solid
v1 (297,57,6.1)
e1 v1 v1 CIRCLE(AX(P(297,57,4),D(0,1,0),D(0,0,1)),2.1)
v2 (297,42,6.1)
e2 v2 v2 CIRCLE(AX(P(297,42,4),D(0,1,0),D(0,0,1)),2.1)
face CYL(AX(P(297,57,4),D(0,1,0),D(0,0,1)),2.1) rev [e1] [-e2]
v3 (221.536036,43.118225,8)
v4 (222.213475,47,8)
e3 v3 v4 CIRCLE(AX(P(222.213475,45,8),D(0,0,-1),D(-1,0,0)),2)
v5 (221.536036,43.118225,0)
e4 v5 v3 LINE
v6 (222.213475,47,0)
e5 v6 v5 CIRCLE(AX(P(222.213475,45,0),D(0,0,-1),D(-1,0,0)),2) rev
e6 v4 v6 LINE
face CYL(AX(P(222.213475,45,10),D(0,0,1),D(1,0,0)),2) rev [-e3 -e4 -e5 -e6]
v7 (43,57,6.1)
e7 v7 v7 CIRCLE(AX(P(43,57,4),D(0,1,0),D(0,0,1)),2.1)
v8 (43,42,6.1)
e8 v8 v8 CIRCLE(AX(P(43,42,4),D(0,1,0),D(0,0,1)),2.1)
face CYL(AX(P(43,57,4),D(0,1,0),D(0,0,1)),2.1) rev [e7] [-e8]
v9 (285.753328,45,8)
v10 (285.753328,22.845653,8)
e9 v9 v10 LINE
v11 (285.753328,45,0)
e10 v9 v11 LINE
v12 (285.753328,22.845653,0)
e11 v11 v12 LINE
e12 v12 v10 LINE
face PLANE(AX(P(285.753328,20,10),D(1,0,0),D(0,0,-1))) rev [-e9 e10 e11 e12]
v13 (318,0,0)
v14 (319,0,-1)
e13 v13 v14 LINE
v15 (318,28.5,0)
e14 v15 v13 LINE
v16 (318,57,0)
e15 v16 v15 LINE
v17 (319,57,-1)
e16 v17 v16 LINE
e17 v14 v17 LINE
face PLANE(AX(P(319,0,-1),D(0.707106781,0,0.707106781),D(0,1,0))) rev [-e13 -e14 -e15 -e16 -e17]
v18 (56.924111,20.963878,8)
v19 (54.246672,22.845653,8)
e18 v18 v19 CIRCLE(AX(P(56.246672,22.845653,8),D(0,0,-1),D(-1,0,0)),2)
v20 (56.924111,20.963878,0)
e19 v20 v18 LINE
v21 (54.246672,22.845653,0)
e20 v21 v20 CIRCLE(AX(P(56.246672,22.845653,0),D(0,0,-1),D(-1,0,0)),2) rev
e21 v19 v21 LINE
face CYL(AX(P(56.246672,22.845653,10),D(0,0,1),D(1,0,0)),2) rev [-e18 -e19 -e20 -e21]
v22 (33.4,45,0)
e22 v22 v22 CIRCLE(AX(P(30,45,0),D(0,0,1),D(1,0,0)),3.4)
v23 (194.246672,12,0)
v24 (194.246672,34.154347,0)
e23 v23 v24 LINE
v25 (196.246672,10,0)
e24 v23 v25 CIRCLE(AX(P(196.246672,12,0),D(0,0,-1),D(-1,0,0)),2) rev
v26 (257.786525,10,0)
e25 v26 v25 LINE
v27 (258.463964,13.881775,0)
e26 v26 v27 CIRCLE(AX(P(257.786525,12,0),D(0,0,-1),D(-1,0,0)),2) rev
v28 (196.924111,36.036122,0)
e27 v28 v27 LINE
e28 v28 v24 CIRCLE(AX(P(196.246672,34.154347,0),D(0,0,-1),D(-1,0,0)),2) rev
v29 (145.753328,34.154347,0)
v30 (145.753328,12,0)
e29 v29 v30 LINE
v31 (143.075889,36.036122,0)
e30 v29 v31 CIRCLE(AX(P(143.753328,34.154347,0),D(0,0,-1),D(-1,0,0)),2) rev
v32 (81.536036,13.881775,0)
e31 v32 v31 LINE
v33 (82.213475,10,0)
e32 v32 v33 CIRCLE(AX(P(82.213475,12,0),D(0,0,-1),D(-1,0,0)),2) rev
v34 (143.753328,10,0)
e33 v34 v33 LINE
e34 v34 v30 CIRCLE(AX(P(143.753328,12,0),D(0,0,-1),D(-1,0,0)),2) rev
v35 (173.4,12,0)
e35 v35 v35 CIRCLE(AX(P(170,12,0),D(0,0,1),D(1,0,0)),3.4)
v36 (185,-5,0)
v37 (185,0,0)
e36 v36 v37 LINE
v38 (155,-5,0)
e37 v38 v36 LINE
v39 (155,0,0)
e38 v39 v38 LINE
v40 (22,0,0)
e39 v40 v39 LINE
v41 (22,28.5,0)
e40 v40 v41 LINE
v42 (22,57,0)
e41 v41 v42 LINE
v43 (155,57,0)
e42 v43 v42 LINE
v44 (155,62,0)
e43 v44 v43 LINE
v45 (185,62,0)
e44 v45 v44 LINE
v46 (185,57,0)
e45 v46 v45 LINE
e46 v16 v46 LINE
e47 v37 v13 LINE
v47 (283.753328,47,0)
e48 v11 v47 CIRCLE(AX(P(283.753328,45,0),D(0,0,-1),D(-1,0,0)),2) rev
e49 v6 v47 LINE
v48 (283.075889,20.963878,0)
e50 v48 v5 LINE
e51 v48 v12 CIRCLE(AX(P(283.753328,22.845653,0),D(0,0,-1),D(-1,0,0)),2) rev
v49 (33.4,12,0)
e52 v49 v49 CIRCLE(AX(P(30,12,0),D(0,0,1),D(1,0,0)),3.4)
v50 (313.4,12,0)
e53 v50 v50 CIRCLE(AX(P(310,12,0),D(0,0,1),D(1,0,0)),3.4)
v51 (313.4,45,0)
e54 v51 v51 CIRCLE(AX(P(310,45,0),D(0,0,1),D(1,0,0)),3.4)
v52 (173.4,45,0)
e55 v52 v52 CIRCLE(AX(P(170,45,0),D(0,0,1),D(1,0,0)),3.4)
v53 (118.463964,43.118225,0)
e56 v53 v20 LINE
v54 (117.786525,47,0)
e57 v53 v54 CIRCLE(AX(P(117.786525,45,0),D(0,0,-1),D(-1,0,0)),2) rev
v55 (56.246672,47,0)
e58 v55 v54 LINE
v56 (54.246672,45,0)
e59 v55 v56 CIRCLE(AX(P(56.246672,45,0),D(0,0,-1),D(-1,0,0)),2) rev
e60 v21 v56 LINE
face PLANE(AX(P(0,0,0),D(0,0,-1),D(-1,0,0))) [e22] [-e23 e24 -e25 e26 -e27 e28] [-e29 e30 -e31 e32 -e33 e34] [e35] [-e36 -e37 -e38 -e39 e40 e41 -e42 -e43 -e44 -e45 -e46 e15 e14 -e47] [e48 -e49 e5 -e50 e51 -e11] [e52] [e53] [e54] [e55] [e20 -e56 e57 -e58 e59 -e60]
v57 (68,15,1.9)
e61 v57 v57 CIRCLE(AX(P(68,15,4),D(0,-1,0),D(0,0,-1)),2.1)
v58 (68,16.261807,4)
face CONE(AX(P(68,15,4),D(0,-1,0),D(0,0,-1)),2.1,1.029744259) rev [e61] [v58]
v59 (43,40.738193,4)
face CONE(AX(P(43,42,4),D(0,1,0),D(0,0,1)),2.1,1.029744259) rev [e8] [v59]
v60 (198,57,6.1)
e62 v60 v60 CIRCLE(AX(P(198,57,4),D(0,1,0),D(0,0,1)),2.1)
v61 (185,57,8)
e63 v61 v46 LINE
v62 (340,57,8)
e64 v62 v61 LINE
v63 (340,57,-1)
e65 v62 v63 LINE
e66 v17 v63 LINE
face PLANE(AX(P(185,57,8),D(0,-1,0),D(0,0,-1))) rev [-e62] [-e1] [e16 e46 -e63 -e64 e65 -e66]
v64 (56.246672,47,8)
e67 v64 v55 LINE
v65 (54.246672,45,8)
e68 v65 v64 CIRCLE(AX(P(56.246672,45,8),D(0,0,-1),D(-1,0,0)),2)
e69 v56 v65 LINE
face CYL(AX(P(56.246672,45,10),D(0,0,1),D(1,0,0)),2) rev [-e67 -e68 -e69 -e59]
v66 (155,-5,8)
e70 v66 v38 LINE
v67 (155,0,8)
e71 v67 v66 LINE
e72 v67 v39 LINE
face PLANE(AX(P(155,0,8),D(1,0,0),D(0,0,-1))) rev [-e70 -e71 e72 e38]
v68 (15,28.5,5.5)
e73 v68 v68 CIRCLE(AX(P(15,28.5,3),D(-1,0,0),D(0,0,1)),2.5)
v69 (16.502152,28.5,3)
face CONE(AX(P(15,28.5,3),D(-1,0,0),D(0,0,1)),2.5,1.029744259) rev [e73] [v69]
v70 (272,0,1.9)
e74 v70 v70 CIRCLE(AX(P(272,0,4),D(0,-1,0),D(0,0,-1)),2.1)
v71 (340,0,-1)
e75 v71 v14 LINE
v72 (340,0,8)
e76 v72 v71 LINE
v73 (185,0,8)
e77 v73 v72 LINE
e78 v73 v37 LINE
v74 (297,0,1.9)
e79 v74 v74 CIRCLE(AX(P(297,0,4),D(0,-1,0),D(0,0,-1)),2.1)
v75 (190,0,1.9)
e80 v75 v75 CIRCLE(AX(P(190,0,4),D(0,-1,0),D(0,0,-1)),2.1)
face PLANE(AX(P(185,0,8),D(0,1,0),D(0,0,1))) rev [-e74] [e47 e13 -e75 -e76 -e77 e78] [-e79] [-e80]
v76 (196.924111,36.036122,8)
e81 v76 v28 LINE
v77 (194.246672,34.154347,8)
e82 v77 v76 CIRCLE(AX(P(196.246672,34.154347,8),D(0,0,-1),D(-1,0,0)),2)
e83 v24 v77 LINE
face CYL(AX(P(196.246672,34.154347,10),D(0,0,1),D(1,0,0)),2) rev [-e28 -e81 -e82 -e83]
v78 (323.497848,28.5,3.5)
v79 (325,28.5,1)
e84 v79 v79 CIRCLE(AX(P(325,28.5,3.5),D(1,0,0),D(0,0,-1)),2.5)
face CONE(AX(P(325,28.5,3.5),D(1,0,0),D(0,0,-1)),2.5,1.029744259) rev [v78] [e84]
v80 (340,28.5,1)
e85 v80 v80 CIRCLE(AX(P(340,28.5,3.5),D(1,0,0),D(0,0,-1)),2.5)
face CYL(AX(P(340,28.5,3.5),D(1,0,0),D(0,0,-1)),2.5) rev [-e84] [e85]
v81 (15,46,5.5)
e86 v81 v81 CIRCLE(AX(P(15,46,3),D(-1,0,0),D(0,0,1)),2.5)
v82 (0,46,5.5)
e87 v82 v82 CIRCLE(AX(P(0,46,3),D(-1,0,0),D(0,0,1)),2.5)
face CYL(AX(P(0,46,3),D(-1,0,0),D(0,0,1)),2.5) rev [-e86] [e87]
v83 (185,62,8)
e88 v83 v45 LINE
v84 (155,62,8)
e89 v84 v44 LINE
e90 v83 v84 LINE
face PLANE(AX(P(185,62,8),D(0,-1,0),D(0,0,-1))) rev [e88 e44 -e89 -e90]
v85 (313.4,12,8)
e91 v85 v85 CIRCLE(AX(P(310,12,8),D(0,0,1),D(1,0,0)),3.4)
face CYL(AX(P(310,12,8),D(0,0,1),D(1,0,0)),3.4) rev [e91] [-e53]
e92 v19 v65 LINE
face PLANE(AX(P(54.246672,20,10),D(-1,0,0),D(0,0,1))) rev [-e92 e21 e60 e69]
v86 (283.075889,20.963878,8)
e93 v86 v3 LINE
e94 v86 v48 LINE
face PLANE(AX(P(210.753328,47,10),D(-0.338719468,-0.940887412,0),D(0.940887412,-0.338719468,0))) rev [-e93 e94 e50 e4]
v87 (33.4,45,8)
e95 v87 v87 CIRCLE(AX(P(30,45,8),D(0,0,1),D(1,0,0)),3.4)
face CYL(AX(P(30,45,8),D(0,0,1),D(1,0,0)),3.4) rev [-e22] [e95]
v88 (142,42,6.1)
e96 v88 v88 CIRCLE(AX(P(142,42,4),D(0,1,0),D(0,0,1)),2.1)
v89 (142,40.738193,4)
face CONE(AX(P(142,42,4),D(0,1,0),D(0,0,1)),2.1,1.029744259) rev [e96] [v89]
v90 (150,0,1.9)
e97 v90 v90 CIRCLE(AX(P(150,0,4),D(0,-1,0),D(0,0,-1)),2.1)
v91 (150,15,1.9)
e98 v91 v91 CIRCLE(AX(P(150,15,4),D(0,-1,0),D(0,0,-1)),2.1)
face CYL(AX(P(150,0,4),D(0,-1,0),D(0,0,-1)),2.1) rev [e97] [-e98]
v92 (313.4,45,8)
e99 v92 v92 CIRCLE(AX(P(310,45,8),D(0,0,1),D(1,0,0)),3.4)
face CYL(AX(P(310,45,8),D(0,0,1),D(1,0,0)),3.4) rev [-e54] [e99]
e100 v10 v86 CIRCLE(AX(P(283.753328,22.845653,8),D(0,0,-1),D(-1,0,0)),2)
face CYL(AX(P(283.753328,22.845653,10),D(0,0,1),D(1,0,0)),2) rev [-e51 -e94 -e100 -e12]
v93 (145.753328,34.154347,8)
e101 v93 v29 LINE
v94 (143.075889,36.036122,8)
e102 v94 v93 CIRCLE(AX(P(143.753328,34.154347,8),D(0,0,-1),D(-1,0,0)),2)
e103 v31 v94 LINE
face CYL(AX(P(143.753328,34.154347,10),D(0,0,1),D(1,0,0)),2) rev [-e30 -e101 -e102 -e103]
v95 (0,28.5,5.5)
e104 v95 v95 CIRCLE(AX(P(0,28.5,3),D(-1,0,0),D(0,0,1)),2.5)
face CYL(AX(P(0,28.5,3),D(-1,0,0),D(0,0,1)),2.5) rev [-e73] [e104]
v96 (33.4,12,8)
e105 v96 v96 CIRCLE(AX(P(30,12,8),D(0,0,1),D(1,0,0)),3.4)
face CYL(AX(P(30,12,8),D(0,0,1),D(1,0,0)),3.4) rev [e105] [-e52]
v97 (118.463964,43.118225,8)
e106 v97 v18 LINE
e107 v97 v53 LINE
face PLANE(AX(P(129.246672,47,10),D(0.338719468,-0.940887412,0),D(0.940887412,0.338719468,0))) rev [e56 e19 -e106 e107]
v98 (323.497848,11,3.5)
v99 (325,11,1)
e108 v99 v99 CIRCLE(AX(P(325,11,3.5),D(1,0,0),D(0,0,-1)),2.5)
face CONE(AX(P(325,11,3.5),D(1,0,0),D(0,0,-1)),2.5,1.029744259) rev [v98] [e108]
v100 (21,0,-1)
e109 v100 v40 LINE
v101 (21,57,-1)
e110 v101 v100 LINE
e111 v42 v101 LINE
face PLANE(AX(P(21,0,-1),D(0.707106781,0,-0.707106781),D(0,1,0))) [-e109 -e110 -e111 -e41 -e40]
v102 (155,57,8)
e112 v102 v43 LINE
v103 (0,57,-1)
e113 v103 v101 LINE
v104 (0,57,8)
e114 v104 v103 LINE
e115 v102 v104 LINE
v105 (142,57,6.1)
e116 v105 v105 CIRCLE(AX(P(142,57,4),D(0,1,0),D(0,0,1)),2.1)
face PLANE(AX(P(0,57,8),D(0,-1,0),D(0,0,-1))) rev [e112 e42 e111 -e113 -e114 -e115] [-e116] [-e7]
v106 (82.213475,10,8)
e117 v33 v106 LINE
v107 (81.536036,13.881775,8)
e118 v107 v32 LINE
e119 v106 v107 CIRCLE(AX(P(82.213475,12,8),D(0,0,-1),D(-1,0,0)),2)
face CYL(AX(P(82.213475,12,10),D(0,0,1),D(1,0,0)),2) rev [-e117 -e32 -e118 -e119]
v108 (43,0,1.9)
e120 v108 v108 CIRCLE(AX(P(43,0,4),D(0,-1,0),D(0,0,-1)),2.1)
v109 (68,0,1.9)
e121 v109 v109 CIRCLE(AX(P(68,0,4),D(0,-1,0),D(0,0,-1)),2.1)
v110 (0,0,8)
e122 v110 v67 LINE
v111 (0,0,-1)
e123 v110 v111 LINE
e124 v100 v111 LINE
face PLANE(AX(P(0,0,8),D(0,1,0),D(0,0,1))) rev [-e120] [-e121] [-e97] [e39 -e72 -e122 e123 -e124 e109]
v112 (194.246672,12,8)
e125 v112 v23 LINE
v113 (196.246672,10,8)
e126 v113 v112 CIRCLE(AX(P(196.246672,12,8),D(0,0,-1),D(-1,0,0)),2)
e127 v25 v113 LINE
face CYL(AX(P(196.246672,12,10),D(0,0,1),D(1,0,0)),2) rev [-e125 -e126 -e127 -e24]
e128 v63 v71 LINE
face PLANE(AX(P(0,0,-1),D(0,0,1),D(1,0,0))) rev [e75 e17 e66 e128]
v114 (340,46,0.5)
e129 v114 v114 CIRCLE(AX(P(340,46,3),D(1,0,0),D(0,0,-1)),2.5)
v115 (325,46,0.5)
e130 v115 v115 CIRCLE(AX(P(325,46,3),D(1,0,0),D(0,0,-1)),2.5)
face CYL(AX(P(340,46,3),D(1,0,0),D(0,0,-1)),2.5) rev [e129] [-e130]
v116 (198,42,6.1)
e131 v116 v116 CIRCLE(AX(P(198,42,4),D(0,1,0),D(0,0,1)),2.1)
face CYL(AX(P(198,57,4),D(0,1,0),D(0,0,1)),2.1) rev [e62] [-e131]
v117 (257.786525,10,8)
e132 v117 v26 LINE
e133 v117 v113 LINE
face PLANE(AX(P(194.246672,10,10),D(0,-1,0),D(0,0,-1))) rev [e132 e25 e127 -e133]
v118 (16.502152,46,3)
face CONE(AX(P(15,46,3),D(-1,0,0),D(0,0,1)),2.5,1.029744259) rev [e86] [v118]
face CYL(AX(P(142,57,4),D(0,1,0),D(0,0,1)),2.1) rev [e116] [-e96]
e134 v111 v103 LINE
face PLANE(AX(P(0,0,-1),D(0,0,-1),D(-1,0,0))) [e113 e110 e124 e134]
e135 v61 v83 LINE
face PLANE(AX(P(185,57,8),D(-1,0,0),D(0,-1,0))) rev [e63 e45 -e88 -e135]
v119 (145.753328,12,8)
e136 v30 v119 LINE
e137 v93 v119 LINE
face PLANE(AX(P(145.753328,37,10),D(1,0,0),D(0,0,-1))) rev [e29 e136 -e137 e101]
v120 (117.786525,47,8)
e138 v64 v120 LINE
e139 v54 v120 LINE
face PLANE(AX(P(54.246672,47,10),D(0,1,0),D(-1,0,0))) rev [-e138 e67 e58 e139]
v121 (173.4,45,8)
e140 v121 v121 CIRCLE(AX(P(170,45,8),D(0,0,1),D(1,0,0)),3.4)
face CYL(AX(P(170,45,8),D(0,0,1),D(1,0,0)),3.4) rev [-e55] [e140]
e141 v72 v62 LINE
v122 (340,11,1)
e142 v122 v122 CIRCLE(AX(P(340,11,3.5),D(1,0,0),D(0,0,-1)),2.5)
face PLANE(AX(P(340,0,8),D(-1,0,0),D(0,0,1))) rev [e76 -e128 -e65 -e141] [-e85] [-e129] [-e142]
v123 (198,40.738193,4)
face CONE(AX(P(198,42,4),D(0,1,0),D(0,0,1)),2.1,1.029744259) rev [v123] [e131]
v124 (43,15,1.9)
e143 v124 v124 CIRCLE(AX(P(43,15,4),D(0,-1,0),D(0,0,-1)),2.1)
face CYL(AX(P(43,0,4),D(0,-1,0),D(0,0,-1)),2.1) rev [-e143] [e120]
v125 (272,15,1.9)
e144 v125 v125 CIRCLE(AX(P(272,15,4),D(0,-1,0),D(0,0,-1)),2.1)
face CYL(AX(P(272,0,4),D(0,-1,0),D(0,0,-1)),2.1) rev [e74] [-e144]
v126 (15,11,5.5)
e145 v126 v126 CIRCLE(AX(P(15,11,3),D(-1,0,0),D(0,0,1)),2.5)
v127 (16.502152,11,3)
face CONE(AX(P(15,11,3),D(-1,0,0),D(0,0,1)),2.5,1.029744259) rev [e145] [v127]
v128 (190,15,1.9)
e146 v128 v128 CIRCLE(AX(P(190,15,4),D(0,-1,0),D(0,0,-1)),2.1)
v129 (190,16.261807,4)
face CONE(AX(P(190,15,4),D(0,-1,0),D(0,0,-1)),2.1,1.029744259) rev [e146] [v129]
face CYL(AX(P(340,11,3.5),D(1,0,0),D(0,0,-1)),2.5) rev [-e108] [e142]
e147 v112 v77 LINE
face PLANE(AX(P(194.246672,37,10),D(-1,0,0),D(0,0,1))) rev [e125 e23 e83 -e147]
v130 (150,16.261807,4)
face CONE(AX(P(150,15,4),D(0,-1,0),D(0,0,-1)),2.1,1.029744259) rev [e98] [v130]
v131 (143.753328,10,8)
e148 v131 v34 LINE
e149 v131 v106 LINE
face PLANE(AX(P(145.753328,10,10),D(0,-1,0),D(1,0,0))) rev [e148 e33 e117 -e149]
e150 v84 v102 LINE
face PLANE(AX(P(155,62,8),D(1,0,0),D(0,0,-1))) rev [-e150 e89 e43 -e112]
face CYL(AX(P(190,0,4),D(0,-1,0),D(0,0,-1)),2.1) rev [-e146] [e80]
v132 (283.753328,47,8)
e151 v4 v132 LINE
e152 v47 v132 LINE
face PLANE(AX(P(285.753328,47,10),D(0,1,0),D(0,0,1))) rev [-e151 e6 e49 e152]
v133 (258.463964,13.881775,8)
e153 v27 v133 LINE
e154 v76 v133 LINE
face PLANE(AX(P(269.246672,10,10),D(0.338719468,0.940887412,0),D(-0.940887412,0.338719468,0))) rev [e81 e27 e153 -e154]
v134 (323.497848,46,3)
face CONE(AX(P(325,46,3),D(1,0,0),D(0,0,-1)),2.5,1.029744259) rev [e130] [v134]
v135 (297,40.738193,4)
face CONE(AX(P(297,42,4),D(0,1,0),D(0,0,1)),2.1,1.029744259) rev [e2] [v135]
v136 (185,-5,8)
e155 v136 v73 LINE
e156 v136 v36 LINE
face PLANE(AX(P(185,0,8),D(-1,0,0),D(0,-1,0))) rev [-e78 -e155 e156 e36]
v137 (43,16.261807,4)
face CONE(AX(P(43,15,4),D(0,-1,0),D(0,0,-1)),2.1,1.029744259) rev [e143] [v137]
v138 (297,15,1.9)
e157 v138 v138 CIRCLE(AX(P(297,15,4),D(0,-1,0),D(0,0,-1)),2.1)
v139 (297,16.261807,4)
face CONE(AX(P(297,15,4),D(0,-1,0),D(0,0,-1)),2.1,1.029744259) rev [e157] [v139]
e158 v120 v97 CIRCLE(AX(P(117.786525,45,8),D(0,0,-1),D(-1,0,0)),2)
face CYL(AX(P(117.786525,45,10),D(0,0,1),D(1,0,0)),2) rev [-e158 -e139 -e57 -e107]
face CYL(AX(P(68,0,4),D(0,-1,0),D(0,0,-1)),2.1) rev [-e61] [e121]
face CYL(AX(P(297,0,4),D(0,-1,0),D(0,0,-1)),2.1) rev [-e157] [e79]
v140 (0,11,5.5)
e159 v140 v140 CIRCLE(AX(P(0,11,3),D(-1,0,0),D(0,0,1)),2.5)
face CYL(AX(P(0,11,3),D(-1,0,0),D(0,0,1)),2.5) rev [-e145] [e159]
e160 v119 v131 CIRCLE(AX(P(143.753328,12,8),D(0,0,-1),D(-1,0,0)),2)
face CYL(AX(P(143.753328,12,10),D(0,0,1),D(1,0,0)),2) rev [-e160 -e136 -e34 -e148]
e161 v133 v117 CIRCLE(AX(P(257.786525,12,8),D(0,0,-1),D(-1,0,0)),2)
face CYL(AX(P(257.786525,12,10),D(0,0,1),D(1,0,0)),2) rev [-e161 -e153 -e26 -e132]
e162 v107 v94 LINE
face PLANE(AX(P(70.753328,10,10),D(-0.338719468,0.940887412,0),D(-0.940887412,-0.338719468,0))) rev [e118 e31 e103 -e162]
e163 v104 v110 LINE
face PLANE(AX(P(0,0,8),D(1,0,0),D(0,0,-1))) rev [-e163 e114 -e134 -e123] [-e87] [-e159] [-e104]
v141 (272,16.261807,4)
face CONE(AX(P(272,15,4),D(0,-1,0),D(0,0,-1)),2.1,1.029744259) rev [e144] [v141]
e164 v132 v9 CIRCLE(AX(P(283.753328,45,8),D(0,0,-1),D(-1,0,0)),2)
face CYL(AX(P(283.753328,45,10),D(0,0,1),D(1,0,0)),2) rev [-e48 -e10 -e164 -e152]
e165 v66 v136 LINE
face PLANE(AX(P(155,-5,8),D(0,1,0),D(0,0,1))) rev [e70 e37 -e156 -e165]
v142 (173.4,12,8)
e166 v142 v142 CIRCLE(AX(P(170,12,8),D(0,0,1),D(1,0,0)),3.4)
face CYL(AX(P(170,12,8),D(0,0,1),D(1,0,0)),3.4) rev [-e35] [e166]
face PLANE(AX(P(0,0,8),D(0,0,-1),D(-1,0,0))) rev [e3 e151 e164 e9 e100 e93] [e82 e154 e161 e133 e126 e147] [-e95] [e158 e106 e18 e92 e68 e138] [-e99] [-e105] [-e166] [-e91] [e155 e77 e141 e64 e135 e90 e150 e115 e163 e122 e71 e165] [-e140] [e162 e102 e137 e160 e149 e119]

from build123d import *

# Parameters (mm, degrees)
RESSALTO_EXTRUS_O1_DEPTH                    = 8
BROCA_DE_ROSQUEAR_PARA_TARRAXA_DE_M82_D     = 6.8
ESBO_O8_W                                   = 28
ESBO_O8_H                                   = 57
RESSALTO_EXTRUS_O2_DEPTH                    = 1
BROCA_DE_ROSQUEAR_PARA_TARRAXA_DE_M61_D     = 5
BROCA_DE_ROSQUEAR_PARA_TARRAXA_DE_M61_DEPTH = 15
BROCA_DE_ROSQUEAR_PARA_TARRAXA_DE_M61_TIP   = 1.502151548
BROCA_DE_ROSQUEAR_PARA_TARRAXA_DE_M62_D     = 5
BROCA_DE_ROSQUEAR_PARA_TARRAXA_DE_M62_DEPTH = 15
BROCA_DE_ROSQUEAR_PARA_TARRAXA_DE_M62_TIP   = 1.502151548
CHANFRO2_SIZE                               = 7
CHANFRO3_SIZE                               = 7
CORTE_EXTRUS_O1_DEPTH                       = 10
FILETE1_R                                   = 2
BROCA_DE_ROSQUEAR_PARA_TARRAXA_DE_M51_D     = 4.2
BROCA_DE_ROSQUEAR_PARA_TARRAXA_DE_M51_DEPTH = 15
BROCA_DE_ROSQUEAR_PARA_TARRAXA_DE_M51_TIP   = 1.2618073
BROCA_DE_ROSQUEAR_PARA_TARRAXA_DE_M52_D     = 4.2
BROCA_DE_ROSQUEAR_PARA_TARRAXA_DE_M52_DEPTH = 15
BROCA_DE_ROSQUEAR_PARA_TARRAXA_DE_M52_TIP   = 1.2618073
FILETE2_R                                   = 2


with BuildPart() as part:
    # Esboço1 → Ressalto-extrusão1 (new body)
    with BuildSketch(Plane.XY):
        Polygon((185, 57), (185, 62), (155, 62), (155, 57), (0, 57), (0, 0), (155, 0), (155, -5), (185, -5), (185, 0), (340, 0), (340, 57), align=None)
    extrude(amount=RESSALTO_EXTRUS_O1_DEPTH)

    # Broca de rosquear para tarraxa de M82 (through all)
    with Locations(Plane.XY.offset(8)):
        with Locations((30, 45), (30, 12), (170, 45), (170, 12), (310, 45), (310, 12)):
            Hole(BROCA_DE_ROSQUEAR_PARA_TARRAXA_DE_M82_D / 2)

    # Esboço8 → Ressalto-extrusão2 (add)
    with BuildSketch(Plane(origin=(0, 0, 0), x_dir=(-1, 0, 0), z_dir=(0, 0, -1))):
        with Locations((-326, 28.5)):
            Rectangle(ESBO_O8_W, ESBO_O8_H)
        with Locations((-14, 28.5)):
            Rectangle(ESBO_O8_W, ESBO_O8_H)
    extrude(amount=RESSALTO_EXTRUS_O2_DEPTH)

    # Broca de rosquear para tarraxa de M61
    with Locations(Plane(origin=(340, 0, 0), x_dir=(0, 0, -1), z_dir=(1, 0, 0))):
        with Locations((-3, 46), (-3.5, 28.5), (-3.5, 11)):
            Hole(BROCA_DE_ROSQUEAR_PARA_TARRAXA_DE_M61_D / 2, depth=BROCA_DE_ROSQUEAR_PARA_TARRAXA_DE_M61_DEPTH)
            with Locations((0, 0, -(BROCA_DE_ROSQUEAR_PARA_TARRAXA_DE_M61_DEPTH + BROCA_DE_ROSQUEAR_PARA_TARRAXA_DE_M61_TIP / 2))):  # 118° drill point
                Cone(0, BROCA_DE_ROSQUEAR_PARA_TARRAXA_DE_M61_D / 2, BROCA_DE_ROSQUEAR_PARA_TARRAXA_DE_M61_TIP, mode=Mode.SUBTRACT)

    # Broca de rosquear para tarraxa de M62
    with Locations(Plane.ZY):
        with Locations((3, 46), (3, 11), (3, 28.5)):
            Hole(BROCA_DE_ROSQUEAR_PARA_TARRAXA_DE_M62_D / 2, depth=BROCA_DE_ROSQUEAR_PARA_TARRAXA_DE_M62_DEPTH)
            with Locations((0, 0, -(BROCA_DE_ROSQUEAR_PARA_TARRAXA_DE_M62_DEPTH + BROCA_DE_ROSQUEAR_PARA_TARRAXA_DE_M62_TIP / 2))):  # 118° drill point
                Cone(0, BROCA_DE_ROSQUEAR_PARA_TARRAXA_DE_M62_D / 2, BROCA_DE_ROSQUEAR_PARA_TARRAXA_DE_M62_TIP, mode=Mode.SUBTRACT)

    # Chanfro2
    # the kernel refuses this chamfer: 7 mm, written as the material it takes off along each edge
    with BuildSketch(Plane(origin=(28, -18.001780916, -1), x_dir=(0.02749587661058661, 0, 0.9996219169112968), z_dir=(0, 1, 0))) as chanfro2_piece_1_section:
        Polygon((CHANFRO2_SIZE * 0.999621916911, -CHANFRO2_SIZE * 0.0274958766106), (-CHANFRO2_SIZE * 0.0274958766106, -CHANFRO2_SIZE * 0.999621916911), (0, 0), align=None)
    chanfro2_piece_1 = extrude(amount=93.003561832, mode=Mode.PRIVATE)
    chanfro2_piece_1 = split(chanfro2_piece_1, bisect_by=Plane(origin=(24.64888361, 28.5, 0), z_dir=(0, 0, -1)), keep=Keep.TOP, mode=Mode.PRIVATE)
    add(chanfro2_piece_1, mode=Mode.SUBTRACT)

    # Chanfro3
    # the kernel refuses this chamfer: 7 mm, written as the material it takes off along each edge
    with BuildSketch(Plane(origin=(312, -18.001780916, -1), x_dir=(-0.027495876610590064, 0, 0.9996219169112966), z_dir=(0, 1, 0))) as chanfro3_piece_1_section:
        Polygon((CHANFRO3_SIZE * 0.999621916911, CHANFRO3_SIZE * 0.0274958766106), (-CHANFRO3_SIZE * 0.0274958766106, CHANFRO3_SIZE * 0.999621916911), (0, 0), align=None)
    chanfro3_piece_1 = extrude(amount=93.003561832, mode=Mode.PRIVATE)
    chanfro3_piece_1 = split(chanfro3_piece_1, bisect_by=Plane(origin=(315.35111639, 28.5, 0), z_dir=(0, 0, -1)), keep=Keep.TOP, mode=Mode.PRIVATE)
    add(chanfro3_piece_1, mode=Mode.SUBTRACT)

    # Esboço10 → Corte-extrusão1 (cut)
    with BuildSketch(Plane(origin=(0, 0, 0), x_dir=(-1, 0, 0), z_dir=(0, 0, -1))):
        Polygon((-285.753328204, 47), (-210.753328204, 47), (-285.753328204, 20), align=None)
        Polygon((-269.246671796, 10), (-194.246671796, 37), (-194.246671796, 10), align=None)
        Polygon((-145.753328204, 10), (-70.753328204, 10), (-145.753328204, 37), align=None)
        Polygon((-54.246671796, 20), (-54.246671796, 47), (-129.246671796, 47), align=None)
    extrude(amount=-CORTE_EXTRUS_O1_DEPTH, mode=Mode.SUBTRACT)

    # Filete1
    filete1_edges = [part.edges().sort_by_distance(p)[0] for p in [
        (194.246671796, 10, 4),
        (269.246671796, 10, 4),
        (194.246671796, 37, 4),
        (285.753328204, 20, 4),
        (285.753328204, 47, 4),
        (210.753328204, 47, 4),
    ]]
    fillet(filete1_edges, radius=FILETE1_R)

    # Broca de rosquear para tarraxa de M51
    with Locations(Plane(origin=(0, 57, 0), x_dir=(1, 0, 0), z_dir=(0, 1, 0))):
        with Locations((43, -4), (142, -4), (198, -4), (297, -4)):
            Hole(BROCA_DE_ROSQUEAR_PARA_TARRAXA_DE_M51_D / 2, depth=BROCA_DE_ROSQUEAR_PARA_TARRAXA_DE_M51_DEPTH)
            with Locations((0, 0, -(BROCA_DE_ROSQUEAR_PARA_TARRAXA_DE_M51_DEPTH + BROCA_DE_ROSQUEAR_PARA_TARRAXA_DE_M51_TIP / 2))):  # 118° drill point
                Cone(0, BROCA_DE_ROSQUEAR_PARA_TARRAXA_DE_M51_D / 2, BROCA_DE_ROSQUEAR_PARA_TARRAXA_DE_M51_TIP, mode=Mode.SUBTRACT)

    # Broca de rosquear para tarraxa de M52
    with Locations(Plane(origin=(0, 0, 0), x_dir=(-1, 0, 0), z_dir=(0, -1, 0))):
        with Locations((-150, -4), (-190, -4), (-297, -4), (-43, -4), (-272, -4), (-68, -4)):
            Hole(BROCA_DE_ROSQUEAR_PARA_TARRAXA_DE_M52_D / 2, depth=BROCA_DE_ROSQUEAR_PARA_TARRAXA_DE_M52_DEPTH)
            with Locations((0, 0, -(BROCA_DE_ROSQUEAR_PARA_TARRAXA_DE_M52_DEPTH + BROCA_DE_ROSQUEAR_PARA_TARRAXA_DE_M52_TIP / 2))):  # 118° drill point
                Cone(0, BROCA_DE_ROSQUEAR_PARA_TARRAXA_DE_M52_D / 2, BROCA_DE_ROSQUEAR_PARA_TARRAXA_DE_M52_TIP, mode=Mode.SUBTRACT)

    # Filete2
    filete2_edges = [part.edges().sort_by_distance(p)[0] for p in [
        (145.753328204, 10, 4),
        (145.753328204, 37, 4),
        (70.753328204, 10, 4),
        (54.246671796, 20, 4),
        (129.246671796, 47, 4),
        (54.246671796, 47, 4),
    ]]
    fillet(filete2_edges, radius=FILETE2_R)


solid = part.part
